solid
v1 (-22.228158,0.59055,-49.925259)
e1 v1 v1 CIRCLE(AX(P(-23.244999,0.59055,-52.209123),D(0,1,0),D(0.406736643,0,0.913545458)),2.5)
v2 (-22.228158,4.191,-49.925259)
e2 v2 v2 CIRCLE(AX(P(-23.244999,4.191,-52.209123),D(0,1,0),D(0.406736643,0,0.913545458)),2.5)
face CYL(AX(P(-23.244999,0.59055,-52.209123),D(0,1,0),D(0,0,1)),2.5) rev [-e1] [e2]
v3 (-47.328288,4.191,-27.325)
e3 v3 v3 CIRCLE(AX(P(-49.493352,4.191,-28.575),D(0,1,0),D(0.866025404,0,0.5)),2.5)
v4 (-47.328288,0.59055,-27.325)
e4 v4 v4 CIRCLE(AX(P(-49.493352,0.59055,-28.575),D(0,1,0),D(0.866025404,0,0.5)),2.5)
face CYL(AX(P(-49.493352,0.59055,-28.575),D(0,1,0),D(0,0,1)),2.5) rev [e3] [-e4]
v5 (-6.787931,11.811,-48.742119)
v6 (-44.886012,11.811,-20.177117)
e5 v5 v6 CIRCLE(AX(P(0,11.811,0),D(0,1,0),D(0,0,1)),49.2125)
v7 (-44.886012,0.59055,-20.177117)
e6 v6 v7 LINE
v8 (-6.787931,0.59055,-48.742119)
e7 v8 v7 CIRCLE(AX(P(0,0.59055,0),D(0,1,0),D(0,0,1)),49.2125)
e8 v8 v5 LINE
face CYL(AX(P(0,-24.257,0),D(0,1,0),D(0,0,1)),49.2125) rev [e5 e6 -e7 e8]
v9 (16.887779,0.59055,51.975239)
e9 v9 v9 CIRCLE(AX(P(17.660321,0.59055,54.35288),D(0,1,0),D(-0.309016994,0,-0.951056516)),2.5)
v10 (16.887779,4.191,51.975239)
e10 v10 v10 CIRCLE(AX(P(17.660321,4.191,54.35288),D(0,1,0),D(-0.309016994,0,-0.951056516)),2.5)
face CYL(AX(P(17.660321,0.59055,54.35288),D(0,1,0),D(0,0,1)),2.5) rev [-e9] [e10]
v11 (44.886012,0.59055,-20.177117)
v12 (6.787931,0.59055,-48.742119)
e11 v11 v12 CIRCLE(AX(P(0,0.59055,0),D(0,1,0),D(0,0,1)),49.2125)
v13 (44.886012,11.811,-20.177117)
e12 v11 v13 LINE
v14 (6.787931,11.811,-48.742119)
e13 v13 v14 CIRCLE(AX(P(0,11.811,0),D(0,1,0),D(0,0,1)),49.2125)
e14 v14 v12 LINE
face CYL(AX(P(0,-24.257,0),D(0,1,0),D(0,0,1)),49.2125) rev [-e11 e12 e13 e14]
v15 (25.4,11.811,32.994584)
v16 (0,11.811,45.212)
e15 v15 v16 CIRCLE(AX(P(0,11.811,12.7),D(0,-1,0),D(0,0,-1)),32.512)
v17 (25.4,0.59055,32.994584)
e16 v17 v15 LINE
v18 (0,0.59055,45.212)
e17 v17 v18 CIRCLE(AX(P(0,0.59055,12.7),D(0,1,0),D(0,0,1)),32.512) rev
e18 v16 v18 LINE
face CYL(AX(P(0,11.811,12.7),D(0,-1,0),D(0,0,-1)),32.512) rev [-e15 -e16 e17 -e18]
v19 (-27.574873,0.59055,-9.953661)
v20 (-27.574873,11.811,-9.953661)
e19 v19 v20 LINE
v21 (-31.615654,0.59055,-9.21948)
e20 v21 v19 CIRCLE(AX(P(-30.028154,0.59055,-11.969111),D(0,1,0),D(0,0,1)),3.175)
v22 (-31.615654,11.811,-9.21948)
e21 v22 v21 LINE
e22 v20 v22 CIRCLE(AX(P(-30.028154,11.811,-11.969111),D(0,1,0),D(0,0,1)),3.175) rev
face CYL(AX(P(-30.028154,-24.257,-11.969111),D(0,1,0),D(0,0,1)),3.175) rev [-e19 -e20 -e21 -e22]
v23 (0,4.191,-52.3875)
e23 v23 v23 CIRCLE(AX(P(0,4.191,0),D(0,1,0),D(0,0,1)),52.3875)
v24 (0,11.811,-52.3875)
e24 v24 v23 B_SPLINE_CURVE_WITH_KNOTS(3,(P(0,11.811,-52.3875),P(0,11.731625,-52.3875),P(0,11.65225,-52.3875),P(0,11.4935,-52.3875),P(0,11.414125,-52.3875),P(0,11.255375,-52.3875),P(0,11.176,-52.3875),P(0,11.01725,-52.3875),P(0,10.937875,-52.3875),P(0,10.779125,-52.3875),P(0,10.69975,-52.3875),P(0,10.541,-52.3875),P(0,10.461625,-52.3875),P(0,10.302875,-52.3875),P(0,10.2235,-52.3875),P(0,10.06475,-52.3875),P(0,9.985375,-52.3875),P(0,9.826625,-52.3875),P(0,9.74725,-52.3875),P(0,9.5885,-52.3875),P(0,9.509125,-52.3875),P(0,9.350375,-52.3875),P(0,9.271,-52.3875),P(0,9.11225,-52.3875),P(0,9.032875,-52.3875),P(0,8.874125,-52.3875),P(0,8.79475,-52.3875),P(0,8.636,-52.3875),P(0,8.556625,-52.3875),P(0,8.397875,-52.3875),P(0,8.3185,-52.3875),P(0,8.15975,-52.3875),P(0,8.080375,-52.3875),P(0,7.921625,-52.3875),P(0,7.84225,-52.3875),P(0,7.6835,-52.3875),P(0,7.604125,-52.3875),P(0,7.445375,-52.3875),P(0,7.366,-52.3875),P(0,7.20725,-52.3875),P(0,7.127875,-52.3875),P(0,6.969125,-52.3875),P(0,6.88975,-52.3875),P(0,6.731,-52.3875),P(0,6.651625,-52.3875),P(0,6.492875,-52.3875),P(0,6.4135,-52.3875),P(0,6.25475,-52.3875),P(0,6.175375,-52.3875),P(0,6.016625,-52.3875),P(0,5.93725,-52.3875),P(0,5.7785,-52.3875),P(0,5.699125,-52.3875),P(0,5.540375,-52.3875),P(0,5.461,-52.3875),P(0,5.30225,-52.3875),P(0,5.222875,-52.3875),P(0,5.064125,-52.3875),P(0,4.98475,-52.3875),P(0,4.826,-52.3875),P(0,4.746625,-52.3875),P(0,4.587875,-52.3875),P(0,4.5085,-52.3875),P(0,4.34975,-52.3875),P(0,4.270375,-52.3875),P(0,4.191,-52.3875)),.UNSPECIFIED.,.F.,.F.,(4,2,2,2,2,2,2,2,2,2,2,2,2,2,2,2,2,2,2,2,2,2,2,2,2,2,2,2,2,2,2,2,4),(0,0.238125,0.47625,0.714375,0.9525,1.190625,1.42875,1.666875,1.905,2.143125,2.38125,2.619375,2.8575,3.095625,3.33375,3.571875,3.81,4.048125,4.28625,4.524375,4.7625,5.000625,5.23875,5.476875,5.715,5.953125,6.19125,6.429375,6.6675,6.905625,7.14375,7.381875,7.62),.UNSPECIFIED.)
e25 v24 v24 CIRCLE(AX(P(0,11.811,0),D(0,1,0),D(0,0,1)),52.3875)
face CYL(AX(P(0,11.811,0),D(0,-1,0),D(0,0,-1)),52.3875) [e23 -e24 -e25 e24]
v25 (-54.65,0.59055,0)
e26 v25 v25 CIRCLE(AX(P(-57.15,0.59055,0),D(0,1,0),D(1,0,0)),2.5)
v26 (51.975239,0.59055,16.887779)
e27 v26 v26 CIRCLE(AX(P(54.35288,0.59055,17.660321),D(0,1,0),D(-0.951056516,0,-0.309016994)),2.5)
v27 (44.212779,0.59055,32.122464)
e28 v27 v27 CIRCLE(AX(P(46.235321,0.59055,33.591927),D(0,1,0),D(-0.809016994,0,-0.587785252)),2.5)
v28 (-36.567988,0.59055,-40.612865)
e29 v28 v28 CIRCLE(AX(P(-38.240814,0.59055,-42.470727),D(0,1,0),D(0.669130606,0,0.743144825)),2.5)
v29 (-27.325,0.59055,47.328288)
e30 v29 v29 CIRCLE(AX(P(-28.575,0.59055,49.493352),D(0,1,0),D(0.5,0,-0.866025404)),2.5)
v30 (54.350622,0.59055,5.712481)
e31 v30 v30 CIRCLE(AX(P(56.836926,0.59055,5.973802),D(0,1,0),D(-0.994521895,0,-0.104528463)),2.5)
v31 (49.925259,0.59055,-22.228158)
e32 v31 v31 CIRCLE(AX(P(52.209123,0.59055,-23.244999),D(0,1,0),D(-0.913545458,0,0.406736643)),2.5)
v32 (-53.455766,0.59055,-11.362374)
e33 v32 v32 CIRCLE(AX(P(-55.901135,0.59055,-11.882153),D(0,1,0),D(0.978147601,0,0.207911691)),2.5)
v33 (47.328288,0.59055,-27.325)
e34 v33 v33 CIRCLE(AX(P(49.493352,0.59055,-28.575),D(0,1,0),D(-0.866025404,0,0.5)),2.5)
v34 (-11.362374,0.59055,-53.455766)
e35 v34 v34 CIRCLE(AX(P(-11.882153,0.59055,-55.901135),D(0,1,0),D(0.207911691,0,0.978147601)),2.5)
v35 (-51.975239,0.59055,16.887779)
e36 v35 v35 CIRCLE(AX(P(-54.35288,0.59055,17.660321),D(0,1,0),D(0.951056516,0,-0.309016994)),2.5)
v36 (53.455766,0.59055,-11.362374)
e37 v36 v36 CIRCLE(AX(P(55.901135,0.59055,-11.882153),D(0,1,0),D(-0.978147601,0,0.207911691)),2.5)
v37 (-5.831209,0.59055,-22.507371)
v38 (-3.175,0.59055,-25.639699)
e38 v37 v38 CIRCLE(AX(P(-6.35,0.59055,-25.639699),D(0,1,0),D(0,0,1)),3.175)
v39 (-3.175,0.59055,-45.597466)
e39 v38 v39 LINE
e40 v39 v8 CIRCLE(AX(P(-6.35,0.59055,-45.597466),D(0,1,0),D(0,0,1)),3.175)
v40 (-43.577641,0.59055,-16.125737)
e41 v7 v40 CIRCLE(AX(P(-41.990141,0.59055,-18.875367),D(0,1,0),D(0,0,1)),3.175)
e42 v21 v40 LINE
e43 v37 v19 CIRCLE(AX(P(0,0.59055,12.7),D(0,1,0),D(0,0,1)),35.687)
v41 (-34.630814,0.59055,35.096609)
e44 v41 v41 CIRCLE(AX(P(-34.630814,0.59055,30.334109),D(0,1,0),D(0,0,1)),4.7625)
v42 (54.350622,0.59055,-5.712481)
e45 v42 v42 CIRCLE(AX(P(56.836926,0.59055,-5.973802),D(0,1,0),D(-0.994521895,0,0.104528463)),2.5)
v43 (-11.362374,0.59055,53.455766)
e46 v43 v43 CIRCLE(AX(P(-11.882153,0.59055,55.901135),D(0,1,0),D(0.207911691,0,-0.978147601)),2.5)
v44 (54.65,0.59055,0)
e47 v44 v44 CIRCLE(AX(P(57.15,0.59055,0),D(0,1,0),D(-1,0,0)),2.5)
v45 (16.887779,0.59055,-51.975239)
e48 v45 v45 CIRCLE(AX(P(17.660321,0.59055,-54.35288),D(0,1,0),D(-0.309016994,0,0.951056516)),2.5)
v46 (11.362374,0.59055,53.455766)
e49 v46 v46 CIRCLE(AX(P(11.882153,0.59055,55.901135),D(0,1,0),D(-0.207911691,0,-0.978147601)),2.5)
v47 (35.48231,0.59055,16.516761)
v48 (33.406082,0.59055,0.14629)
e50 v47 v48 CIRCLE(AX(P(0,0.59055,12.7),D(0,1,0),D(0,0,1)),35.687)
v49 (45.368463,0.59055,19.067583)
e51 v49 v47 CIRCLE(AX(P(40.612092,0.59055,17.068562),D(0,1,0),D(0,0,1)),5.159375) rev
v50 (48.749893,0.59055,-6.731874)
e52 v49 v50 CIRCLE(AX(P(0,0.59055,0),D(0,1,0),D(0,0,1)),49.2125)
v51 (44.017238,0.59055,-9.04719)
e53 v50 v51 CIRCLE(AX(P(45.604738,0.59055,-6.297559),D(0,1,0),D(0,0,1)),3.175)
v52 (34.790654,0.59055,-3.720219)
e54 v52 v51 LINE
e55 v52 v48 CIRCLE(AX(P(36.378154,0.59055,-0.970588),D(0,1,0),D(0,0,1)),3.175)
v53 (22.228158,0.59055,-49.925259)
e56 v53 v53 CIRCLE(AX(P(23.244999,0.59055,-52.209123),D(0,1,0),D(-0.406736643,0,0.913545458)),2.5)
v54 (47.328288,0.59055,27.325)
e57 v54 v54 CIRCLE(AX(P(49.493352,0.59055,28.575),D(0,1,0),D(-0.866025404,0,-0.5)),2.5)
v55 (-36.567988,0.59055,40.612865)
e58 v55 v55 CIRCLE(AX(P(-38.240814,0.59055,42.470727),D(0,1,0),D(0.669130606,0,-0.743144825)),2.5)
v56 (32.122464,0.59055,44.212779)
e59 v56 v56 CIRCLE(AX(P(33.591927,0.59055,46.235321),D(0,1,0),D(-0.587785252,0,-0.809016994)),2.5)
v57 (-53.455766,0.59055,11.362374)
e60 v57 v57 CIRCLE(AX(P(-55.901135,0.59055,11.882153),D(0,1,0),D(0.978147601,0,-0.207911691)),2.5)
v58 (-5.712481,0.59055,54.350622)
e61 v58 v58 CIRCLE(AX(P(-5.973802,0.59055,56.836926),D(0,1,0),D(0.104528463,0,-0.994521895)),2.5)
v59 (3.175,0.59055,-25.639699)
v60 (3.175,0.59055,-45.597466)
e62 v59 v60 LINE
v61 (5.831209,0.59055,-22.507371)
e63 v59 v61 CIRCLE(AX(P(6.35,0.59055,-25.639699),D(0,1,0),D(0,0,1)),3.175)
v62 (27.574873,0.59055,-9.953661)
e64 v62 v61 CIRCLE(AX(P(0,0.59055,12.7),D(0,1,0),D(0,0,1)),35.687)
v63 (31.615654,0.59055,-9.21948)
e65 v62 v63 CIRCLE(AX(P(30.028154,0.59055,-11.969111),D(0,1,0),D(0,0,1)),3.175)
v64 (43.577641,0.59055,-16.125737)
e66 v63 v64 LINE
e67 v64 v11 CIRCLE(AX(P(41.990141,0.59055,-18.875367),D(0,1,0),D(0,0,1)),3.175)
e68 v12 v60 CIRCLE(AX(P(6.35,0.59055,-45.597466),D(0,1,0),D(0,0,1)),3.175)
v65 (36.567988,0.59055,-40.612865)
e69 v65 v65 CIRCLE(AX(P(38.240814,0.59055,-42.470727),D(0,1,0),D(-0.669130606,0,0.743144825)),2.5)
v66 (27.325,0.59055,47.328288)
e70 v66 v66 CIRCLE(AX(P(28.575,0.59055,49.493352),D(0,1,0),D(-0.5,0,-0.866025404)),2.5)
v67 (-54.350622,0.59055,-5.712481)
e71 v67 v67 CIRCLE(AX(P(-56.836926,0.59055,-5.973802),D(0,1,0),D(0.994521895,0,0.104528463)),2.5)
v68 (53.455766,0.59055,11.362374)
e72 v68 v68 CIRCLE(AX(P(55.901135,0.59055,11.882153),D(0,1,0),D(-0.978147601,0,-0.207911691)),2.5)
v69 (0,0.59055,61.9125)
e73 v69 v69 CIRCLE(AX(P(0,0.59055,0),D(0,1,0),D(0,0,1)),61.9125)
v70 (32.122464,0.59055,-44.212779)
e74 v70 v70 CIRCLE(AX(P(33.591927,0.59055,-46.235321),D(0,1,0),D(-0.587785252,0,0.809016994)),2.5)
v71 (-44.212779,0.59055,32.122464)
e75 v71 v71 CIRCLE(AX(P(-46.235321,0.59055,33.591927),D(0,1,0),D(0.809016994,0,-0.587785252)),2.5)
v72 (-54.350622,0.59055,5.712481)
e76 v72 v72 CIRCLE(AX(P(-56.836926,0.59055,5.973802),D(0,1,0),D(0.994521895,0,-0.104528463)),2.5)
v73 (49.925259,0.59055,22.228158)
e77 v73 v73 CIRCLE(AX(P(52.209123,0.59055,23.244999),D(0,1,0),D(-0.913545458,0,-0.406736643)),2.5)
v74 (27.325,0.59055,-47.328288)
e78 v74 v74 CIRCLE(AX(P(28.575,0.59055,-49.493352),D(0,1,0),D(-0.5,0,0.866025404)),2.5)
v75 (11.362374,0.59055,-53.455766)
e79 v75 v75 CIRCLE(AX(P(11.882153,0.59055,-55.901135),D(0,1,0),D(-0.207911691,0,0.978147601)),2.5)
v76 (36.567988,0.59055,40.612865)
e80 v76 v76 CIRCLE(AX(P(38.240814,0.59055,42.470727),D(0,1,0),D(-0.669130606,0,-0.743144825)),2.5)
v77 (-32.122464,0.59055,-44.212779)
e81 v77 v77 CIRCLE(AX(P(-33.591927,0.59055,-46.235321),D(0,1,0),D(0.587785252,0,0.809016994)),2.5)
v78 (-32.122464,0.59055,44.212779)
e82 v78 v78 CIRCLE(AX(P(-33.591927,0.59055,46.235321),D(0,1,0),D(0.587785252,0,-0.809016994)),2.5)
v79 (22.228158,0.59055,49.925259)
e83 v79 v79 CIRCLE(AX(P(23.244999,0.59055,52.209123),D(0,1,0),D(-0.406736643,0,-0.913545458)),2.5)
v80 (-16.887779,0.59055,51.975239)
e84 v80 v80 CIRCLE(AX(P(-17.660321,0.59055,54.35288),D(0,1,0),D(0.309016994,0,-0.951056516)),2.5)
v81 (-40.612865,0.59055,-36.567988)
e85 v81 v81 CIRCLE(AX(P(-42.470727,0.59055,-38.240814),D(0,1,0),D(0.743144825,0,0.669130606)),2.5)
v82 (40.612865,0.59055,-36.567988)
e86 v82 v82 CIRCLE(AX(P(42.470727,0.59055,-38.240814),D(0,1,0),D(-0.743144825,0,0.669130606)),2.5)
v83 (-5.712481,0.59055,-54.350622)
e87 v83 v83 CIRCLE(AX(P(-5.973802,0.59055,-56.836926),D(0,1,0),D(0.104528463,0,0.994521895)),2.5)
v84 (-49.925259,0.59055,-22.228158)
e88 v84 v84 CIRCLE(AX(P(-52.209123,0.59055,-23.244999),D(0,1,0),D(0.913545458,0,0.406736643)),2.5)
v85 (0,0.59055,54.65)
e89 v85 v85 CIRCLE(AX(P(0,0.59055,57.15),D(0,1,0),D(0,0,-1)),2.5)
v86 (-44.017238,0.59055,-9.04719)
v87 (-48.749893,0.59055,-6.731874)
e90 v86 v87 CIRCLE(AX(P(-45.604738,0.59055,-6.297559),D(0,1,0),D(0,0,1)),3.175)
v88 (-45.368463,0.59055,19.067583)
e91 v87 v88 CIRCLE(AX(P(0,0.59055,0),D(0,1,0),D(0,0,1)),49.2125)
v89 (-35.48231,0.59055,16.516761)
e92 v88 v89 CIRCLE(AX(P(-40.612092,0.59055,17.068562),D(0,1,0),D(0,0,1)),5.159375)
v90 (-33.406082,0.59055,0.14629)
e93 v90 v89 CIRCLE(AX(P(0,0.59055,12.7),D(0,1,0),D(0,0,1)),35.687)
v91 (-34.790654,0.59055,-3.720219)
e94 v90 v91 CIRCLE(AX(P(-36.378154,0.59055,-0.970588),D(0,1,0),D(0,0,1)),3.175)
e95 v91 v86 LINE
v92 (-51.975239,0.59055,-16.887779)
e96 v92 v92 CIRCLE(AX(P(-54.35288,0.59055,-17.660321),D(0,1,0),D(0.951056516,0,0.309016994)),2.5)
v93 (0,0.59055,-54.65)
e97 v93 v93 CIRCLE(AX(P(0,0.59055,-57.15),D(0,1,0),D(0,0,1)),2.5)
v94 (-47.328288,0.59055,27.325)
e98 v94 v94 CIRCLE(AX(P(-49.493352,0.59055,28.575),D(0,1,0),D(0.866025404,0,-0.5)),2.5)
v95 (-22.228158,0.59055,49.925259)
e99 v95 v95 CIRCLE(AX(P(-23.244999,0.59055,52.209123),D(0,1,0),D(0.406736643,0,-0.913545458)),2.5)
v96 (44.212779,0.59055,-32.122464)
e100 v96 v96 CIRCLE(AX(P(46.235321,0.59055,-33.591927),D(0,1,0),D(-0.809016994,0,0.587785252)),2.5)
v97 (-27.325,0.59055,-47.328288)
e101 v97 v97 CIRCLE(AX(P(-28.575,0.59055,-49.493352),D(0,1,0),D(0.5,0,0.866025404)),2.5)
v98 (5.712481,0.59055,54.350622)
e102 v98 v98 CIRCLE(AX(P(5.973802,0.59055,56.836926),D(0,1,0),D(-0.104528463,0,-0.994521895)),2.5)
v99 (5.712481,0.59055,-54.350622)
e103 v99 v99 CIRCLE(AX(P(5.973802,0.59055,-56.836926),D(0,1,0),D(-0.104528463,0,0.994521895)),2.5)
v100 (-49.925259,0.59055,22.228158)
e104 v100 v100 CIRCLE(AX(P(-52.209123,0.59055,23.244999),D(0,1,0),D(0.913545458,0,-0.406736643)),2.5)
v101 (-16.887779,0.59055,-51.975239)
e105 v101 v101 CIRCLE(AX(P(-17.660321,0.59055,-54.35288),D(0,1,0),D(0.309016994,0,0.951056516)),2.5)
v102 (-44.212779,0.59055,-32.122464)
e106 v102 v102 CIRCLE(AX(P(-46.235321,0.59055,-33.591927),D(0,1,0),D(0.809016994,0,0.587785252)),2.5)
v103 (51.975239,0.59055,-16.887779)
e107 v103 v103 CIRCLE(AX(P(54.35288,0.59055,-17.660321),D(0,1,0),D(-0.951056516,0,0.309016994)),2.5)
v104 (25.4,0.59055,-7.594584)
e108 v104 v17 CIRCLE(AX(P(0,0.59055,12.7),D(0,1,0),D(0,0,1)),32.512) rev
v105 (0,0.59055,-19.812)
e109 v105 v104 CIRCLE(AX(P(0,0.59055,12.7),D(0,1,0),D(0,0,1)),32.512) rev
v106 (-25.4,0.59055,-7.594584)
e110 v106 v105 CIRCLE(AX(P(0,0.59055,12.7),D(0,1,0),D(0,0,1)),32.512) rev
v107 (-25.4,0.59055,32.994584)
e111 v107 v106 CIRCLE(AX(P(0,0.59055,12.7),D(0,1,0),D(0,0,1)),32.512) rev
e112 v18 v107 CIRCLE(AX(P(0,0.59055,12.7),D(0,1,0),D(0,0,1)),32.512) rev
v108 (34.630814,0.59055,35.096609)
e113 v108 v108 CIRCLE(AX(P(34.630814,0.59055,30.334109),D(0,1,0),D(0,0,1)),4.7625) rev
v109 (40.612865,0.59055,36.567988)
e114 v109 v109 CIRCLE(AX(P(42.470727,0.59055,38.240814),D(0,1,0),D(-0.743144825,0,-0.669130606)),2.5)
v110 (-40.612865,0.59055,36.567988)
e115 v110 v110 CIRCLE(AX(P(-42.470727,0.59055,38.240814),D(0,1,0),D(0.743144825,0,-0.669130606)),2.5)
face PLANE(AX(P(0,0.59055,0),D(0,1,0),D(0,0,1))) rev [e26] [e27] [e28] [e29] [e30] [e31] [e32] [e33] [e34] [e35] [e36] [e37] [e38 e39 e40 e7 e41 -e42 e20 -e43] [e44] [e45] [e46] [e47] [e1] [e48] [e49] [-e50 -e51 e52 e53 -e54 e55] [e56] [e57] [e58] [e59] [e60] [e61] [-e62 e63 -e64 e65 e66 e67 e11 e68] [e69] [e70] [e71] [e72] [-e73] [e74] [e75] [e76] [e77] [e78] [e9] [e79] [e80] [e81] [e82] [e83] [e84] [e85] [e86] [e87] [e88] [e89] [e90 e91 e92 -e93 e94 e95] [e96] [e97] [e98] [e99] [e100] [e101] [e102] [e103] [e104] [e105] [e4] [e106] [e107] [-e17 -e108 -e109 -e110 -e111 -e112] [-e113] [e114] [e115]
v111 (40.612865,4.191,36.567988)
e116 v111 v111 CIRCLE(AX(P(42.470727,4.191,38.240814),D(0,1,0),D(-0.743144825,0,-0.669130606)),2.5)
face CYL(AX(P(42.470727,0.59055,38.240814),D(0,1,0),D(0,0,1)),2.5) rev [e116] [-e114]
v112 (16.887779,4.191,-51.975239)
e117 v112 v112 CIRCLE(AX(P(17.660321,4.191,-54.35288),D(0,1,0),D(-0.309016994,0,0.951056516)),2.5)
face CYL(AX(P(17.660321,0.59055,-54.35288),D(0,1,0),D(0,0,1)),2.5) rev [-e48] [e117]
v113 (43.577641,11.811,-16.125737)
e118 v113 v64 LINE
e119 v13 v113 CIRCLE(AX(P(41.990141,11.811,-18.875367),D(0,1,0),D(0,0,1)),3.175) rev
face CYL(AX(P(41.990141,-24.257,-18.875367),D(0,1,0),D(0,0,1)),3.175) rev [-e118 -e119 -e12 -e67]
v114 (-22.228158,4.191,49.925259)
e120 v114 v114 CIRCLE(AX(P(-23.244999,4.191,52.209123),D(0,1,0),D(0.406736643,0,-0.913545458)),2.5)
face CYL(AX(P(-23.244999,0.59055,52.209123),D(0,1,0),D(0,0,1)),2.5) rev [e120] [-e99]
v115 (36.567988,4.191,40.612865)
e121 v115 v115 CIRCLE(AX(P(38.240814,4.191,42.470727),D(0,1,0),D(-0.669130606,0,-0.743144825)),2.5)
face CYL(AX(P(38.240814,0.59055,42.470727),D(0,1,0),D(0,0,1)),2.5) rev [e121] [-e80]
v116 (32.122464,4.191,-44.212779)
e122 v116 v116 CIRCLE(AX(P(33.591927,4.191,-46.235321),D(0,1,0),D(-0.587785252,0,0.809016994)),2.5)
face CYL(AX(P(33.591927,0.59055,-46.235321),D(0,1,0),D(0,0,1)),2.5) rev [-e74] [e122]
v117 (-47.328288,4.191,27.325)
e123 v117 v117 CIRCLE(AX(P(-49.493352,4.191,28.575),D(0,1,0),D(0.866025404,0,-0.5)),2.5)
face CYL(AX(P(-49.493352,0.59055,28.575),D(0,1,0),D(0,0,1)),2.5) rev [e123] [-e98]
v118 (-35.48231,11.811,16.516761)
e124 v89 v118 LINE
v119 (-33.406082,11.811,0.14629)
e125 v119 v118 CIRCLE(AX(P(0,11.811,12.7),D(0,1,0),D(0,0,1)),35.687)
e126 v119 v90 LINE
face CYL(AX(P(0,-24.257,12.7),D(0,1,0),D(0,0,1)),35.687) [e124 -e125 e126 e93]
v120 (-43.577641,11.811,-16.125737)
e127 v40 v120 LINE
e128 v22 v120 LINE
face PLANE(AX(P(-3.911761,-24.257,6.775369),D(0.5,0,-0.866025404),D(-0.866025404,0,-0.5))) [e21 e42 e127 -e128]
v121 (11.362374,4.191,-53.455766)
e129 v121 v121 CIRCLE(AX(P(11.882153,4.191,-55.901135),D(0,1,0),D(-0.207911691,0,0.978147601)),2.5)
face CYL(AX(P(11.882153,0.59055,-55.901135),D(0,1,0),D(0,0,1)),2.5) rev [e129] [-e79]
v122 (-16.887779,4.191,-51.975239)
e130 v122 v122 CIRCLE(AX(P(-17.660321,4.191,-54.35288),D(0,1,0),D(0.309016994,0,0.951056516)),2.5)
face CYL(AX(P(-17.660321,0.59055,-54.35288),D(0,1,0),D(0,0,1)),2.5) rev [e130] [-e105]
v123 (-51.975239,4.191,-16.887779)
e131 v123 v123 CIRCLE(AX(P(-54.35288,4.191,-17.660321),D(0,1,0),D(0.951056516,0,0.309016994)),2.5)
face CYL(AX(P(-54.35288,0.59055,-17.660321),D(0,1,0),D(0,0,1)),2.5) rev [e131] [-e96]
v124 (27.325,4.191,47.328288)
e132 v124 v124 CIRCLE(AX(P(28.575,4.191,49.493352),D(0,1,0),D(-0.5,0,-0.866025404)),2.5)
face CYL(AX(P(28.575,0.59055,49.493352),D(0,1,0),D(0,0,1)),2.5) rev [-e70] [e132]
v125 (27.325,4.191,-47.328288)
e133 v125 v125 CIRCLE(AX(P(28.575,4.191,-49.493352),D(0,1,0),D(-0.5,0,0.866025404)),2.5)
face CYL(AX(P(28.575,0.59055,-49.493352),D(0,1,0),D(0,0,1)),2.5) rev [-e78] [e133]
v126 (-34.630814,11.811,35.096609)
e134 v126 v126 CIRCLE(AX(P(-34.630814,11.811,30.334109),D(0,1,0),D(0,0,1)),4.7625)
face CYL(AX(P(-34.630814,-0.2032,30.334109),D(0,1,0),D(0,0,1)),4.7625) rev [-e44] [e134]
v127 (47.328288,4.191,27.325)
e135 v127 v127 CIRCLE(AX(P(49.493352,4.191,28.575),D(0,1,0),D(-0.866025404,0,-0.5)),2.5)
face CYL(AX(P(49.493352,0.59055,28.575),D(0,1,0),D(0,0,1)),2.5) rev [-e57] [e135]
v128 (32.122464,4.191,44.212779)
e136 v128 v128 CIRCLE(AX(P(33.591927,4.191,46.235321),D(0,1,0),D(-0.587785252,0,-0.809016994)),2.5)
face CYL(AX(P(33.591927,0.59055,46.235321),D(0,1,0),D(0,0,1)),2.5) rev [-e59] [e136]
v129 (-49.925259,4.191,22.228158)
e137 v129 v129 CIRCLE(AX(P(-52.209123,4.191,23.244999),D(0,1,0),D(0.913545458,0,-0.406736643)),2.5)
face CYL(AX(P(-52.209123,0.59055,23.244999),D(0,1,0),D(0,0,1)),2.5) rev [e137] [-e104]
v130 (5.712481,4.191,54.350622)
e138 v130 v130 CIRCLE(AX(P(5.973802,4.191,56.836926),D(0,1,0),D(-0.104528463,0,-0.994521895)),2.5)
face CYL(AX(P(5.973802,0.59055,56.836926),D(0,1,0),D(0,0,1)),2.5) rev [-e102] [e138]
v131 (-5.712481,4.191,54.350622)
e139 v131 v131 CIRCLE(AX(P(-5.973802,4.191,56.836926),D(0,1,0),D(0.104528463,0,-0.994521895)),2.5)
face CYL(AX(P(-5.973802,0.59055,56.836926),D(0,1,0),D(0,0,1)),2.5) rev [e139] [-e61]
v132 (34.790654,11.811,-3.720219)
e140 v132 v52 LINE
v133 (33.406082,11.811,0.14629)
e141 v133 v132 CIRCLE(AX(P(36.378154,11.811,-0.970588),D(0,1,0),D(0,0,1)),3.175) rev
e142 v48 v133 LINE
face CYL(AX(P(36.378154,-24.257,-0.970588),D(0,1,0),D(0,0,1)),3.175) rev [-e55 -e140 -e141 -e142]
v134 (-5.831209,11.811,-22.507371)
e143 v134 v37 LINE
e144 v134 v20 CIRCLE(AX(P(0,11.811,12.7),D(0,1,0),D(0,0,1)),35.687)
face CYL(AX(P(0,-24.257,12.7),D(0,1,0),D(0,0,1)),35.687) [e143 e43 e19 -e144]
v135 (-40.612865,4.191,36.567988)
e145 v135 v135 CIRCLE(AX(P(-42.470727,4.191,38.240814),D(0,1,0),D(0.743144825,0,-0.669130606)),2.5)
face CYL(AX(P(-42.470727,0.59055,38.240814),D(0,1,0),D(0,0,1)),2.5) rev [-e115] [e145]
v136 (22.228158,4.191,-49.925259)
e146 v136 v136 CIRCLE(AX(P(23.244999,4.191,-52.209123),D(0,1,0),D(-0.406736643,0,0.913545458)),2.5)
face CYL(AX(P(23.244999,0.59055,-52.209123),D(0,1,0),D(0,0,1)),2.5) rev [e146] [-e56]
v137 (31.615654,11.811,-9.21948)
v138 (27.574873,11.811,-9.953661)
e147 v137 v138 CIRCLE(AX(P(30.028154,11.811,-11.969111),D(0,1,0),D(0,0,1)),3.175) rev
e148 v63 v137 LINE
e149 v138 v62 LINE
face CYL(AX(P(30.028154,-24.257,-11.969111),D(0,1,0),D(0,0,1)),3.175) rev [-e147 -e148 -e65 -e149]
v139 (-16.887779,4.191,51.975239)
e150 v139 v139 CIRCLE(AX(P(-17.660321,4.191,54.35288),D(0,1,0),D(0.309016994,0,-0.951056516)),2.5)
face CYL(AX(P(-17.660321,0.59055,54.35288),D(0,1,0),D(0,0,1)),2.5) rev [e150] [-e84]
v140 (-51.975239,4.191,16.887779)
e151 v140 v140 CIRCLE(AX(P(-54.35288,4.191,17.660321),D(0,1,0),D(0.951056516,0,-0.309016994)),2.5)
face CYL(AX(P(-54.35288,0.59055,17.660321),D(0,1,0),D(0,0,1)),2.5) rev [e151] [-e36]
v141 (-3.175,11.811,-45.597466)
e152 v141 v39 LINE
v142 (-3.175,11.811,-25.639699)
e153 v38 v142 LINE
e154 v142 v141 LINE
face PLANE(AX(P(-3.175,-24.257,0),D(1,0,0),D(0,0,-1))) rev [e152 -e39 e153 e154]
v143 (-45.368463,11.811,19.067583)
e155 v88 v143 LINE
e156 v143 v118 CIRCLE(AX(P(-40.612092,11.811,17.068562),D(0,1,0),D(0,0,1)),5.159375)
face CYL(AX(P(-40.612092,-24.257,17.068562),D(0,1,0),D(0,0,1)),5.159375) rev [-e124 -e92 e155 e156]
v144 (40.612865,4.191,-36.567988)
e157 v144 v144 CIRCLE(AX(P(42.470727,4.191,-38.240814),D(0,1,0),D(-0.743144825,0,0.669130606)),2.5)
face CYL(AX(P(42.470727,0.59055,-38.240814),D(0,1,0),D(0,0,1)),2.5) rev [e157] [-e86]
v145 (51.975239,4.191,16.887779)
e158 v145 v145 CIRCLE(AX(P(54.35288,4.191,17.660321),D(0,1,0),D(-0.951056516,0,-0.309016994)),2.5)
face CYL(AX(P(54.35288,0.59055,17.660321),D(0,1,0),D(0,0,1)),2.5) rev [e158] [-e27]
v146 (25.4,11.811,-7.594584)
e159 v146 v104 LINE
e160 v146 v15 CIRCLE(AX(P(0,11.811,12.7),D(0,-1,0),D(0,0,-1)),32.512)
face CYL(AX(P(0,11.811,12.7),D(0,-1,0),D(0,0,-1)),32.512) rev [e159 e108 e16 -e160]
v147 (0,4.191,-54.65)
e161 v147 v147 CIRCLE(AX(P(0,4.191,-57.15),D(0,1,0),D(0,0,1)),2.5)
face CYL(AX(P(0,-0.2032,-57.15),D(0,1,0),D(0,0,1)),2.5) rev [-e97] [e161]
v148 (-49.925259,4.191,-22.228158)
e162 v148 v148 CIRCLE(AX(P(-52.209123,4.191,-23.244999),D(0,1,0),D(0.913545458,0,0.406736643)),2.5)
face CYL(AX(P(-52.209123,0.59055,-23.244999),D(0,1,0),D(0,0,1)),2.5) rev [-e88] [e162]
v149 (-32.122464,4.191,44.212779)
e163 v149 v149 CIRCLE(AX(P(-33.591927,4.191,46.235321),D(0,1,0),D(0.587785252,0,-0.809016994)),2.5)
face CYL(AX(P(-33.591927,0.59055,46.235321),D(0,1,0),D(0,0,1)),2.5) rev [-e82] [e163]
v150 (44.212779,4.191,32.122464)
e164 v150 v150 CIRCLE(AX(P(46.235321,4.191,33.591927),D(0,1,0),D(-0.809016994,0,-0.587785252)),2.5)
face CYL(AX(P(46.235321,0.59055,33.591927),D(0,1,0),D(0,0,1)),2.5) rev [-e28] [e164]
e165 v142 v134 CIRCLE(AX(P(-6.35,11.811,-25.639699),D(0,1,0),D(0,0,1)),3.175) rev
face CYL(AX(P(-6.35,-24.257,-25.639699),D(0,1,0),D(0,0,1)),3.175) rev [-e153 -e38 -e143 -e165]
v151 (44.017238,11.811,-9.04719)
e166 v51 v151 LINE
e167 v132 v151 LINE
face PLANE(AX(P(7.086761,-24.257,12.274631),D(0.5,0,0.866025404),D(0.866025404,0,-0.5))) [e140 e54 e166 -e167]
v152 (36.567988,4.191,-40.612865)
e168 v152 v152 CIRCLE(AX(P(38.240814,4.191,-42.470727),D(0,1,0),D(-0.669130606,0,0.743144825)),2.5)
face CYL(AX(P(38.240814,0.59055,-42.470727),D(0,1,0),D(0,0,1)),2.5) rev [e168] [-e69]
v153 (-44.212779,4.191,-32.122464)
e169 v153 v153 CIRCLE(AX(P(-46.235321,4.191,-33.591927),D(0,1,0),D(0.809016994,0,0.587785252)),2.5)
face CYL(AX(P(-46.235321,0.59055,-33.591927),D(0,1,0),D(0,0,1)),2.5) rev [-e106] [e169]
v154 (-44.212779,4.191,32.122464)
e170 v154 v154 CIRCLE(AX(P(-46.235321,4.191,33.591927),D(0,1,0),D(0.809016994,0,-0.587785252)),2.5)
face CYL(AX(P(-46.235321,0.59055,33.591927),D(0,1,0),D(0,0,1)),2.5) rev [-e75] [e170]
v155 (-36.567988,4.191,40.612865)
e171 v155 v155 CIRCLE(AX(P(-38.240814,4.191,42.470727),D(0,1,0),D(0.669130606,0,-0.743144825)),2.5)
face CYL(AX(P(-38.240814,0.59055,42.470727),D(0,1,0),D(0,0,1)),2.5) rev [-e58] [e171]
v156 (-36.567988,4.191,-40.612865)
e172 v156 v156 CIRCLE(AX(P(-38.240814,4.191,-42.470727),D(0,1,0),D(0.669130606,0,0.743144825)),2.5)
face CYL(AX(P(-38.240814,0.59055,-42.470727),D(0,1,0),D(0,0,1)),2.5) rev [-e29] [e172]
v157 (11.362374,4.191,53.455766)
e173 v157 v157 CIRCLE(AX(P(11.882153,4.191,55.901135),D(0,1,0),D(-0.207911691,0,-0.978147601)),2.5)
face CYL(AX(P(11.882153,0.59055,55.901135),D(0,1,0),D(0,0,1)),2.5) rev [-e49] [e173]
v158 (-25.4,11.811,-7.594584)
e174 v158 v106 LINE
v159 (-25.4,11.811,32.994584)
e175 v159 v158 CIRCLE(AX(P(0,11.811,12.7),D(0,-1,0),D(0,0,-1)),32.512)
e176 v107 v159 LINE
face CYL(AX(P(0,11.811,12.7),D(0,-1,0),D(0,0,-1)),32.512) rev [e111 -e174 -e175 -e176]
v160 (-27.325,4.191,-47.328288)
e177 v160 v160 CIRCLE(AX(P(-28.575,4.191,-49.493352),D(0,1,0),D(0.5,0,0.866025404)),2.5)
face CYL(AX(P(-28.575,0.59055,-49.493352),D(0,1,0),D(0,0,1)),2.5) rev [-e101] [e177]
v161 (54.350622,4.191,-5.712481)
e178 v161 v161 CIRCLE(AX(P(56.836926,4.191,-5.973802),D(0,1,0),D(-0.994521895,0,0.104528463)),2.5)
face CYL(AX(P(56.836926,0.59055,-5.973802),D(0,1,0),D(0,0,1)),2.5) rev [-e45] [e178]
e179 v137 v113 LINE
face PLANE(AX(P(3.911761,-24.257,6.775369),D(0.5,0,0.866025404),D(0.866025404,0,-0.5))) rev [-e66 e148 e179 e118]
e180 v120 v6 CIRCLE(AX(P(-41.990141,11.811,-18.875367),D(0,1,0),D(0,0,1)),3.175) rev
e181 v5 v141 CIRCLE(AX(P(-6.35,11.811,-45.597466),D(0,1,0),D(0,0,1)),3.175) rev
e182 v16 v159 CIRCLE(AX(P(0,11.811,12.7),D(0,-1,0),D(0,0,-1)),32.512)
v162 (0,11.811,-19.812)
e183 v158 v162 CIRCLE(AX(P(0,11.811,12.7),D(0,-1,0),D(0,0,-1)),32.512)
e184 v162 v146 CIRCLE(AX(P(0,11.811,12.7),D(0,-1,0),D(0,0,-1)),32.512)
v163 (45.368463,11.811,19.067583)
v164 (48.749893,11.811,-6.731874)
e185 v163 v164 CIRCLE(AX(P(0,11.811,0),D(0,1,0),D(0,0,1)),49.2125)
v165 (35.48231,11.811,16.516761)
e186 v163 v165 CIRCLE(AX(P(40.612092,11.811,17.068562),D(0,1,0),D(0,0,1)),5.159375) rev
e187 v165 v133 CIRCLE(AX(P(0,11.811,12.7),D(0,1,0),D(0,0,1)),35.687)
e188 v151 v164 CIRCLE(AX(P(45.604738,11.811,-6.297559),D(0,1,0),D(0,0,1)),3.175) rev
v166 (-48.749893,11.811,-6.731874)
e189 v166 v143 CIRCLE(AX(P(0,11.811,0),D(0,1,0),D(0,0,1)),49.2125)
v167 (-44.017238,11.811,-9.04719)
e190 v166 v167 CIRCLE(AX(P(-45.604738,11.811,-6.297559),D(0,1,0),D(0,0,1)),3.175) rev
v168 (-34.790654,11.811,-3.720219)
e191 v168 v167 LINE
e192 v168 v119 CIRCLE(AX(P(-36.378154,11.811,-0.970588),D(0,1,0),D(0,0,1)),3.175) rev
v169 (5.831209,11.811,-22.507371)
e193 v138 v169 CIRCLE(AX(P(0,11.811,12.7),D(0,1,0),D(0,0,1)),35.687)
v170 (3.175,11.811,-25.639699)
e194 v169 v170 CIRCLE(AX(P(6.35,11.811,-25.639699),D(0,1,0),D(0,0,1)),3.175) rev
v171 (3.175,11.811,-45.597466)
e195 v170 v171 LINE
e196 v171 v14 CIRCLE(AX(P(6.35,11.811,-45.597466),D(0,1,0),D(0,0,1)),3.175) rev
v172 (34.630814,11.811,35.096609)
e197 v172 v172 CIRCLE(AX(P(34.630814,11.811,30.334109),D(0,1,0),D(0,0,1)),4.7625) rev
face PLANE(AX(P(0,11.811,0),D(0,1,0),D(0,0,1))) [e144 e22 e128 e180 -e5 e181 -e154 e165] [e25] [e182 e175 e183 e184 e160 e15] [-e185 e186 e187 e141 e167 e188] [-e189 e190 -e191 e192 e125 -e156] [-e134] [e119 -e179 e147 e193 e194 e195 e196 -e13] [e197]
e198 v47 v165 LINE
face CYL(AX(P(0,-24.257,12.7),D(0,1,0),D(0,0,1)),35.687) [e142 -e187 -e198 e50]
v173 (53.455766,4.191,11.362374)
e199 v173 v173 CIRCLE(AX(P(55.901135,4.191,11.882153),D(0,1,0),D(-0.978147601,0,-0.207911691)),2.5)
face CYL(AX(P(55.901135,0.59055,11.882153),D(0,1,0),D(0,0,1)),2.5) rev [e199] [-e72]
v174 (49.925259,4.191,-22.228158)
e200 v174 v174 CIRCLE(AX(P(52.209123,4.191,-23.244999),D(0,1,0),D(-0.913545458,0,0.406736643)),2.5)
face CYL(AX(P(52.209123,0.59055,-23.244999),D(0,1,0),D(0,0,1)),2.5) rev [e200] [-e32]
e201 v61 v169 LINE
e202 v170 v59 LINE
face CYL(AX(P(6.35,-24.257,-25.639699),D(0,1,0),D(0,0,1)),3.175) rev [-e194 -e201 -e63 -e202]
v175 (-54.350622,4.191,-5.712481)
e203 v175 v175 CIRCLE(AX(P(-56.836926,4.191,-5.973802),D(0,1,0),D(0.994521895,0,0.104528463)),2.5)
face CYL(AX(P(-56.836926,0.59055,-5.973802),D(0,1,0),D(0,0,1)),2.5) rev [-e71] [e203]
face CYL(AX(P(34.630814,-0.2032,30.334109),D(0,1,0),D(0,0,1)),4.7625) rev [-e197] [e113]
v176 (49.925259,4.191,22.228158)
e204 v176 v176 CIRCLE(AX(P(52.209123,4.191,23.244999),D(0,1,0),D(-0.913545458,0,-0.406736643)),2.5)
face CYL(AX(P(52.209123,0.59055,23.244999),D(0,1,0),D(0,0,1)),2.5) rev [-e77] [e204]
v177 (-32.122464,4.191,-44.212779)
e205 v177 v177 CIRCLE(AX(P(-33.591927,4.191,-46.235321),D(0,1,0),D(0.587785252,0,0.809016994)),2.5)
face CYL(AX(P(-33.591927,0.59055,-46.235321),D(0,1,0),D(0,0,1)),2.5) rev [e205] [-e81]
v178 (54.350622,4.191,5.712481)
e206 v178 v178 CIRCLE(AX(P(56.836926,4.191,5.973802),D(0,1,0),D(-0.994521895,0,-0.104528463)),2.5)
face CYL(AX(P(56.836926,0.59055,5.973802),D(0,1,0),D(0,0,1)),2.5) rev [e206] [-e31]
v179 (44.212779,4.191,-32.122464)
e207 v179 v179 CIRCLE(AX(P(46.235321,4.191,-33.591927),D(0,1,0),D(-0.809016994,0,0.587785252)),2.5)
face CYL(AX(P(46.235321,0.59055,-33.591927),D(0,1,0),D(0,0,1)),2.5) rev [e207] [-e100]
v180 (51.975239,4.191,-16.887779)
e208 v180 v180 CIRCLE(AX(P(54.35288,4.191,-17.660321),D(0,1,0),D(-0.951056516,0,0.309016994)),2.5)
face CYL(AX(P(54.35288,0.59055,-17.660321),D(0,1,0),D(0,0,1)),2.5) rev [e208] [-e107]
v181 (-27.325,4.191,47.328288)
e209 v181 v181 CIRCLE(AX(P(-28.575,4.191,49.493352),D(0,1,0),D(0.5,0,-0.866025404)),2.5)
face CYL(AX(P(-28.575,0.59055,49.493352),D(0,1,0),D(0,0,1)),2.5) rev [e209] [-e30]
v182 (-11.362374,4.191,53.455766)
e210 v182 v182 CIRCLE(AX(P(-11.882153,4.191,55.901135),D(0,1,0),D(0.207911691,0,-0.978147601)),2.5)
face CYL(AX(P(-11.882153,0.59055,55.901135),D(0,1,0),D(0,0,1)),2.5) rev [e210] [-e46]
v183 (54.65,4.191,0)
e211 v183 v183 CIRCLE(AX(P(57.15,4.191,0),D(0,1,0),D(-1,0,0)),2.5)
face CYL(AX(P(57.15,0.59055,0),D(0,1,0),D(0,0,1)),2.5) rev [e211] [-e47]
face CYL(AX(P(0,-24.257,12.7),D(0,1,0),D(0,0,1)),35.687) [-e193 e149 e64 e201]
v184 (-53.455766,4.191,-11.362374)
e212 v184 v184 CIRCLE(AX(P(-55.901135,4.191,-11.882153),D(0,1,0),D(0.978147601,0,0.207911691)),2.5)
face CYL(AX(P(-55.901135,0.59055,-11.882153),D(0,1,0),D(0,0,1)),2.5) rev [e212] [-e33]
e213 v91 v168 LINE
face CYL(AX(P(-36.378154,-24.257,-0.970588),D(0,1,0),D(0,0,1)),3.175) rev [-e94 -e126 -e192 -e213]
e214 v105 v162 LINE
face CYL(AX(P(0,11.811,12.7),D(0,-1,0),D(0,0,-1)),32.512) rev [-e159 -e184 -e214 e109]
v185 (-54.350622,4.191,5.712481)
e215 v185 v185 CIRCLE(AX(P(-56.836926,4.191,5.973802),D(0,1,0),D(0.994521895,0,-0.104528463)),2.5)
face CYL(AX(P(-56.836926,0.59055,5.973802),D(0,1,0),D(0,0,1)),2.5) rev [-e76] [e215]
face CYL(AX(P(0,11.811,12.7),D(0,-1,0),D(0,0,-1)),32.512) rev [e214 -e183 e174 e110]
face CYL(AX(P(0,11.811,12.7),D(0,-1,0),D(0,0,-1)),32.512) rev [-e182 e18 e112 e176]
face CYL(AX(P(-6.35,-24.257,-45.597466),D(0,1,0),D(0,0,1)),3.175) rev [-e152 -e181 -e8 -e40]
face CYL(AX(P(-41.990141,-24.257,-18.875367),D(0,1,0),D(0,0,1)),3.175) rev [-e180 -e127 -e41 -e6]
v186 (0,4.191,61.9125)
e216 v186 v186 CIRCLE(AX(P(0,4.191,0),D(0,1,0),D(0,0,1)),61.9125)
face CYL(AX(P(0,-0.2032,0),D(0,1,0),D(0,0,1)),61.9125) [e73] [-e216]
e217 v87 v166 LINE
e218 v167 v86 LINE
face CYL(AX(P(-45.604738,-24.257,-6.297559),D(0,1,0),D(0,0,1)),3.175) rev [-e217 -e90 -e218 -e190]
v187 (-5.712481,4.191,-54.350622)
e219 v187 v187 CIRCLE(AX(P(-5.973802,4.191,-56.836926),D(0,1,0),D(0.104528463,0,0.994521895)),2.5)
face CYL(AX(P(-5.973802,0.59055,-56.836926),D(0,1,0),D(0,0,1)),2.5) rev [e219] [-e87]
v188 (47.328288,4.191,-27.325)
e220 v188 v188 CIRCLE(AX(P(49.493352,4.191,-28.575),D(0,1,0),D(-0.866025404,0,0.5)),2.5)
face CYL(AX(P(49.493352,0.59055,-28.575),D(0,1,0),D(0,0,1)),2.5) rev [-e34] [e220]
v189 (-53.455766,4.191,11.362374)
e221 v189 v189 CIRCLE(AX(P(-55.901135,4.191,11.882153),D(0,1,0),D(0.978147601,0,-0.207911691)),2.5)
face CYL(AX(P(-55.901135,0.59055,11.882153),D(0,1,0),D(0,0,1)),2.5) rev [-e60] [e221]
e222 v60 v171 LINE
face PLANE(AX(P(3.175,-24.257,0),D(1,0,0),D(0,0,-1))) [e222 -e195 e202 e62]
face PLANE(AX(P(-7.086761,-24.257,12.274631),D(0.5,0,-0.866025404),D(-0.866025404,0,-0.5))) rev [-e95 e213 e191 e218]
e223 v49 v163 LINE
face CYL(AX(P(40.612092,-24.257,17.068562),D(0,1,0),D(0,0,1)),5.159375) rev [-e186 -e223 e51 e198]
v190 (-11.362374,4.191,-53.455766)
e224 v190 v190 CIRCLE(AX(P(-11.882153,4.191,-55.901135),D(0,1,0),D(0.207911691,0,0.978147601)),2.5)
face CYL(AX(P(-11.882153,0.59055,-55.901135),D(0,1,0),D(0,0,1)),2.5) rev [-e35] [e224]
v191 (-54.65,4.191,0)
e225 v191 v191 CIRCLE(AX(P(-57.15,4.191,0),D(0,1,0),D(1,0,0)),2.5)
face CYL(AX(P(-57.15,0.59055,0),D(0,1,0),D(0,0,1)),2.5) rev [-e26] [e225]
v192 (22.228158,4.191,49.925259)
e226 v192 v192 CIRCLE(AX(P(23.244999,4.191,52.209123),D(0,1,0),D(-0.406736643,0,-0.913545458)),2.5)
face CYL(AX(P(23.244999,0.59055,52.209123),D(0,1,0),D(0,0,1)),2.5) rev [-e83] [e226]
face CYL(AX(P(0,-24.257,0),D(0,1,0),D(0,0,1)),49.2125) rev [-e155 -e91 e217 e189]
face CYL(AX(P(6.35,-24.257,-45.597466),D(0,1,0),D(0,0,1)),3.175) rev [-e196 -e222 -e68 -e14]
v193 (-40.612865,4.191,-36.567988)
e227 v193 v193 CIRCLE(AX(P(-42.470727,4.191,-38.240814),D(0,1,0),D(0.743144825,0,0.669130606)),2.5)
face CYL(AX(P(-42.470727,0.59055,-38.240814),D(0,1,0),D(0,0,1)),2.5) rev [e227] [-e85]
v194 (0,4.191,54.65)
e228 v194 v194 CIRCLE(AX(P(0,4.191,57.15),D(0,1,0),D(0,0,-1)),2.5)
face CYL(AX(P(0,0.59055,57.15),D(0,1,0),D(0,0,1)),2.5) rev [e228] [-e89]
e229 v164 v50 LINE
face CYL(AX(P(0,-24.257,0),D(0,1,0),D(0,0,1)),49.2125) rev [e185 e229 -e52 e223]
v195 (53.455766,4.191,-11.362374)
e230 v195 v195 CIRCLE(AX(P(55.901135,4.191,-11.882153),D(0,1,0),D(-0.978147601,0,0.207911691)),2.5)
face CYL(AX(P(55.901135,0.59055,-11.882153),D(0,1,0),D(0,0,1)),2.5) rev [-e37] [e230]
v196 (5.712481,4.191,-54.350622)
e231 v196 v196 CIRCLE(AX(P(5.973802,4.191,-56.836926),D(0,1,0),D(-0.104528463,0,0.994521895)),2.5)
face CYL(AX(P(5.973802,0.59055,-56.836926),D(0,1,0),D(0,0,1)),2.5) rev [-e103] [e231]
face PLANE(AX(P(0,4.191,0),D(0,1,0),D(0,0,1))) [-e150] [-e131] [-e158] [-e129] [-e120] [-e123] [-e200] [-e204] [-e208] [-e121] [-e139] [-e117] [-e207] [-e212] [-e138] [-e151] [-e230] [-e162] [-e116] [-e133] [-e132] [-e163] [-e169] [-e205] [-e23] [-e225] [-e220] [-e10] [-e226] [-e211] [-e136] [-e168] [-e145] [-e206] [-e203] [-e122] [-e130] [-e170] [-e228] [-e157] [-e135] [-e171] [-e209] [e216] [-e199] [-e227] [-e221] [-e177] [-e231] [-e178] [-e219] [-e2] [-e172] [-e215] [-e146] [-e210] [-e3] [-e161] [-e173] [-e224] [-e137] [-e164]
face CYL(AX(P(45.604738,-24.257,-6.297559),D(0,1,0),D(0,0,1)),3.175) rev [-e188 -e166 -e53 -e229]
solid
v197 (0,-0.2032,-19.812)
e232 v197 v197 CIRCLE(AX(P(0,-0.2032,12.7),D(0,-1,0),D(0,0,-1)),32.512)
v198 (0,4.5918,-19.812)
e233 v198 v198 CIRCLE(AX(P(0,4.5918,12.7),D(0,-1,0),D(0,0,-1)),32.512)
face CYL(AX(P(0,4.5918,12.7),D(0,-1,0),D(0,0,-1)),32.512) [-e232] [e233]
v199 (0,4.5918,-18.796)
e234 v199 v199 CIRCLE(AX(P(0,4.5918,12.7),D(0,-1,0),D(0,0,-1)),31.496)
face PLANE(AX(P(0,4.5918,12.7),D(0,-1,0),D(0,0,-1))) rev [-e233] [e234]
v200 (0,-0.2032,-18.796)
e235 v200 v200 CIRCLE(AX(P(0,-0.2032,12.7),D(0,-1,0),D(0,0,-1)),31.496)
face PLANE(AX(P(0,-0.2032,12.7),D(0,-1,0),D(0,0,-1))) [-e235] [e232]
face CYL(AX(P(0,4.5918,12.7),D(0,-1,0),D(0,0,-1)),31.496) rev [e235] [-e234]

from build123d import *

# Parameters (mm, degrees)
SLOTTED_BODY_EXTRUDE_DEPTH      = 4.191
SLOTTED_BODY_EXTRUDE_DEPTH_BACK = 0.2032
SKETCH1_R                       = 61.9125
SKETCH1_R_2                     = 30.988
SKETCH5_R                       = 52.3875
BOSS_EXTRUDE3_DEPTH             = 7.62
SKETCH6_R                       = 32.512
CUT_EXTRUDE5_DEPTH              = 89.377917571
SKETCH8_R                       = 32.512
SKETCH8_R_2                     = 31.496
BOSS_EXTRUDE4_DEPTH             = 4.795000062
SKETCH13_R                      = 5.159375
CUT_EXTRUDE7_DEPTH              = 36.068
FILLET1_R                       = 3.175
MOVE_START                      = -0.2032
MOVE_FACE2_OUTLINE_R            = 61.9125
MOVE_FACE2_DEPTH                = 0.79375
SKETCH13_5_R                    = 3.175
CUT_EXTRUDE9_DEPTH              = 89.377917571
MOVE_FACE3_BY                   = 1.5875
MOVE_FACE3_2_BY                 = 1.5875
SKETCH14_R                      = 2.5
CUT_EXTRUDE10_DEPTH             = 88.888450393
CIRPATTERN1_COUNT               = 60


# Read off the part's stored shape, not the designer's step: Move Face2
with BuildPart() as part:
    # Sketch1 → Slotted-Body Extrude (new, two sides: drawn at the far end of the back side and taken through both)
    with BuildSketch(Plane(origin=(0, 0, 0), x_dir=(1, 0, 0), z_dir=(0, 1, 0)).offset(-SLOTTED_BODY_EXTRUDE_DEPTH_BACK)):
        with Locations(Location((0, 0, 0), (0, 0, 270))):
            Circle(SKETCH1_R)
        with Locations(Location((0, -12.7, 0), (0, 0, 270))):
            Circle(SKETCH1_R_2, mode=Mode.SUBTRACT)
    extrude(amount=SLOTTED_BODY_EXTRUDE_DEPTH + SLOTTED_BODY_EXTRUDE_DEPTH_BACK)

    # Sketch5 → Boss-Extrude3 (add)
    with BuildSketch(Plane(origin=(0, 4.191, 0), x_dir=(1, 0, 0), z_dir=(0, 1, 0))):
        with Locations(Location((0, 0, 0), (0, 0, 90))):
            Circle(SKETCH5_R)
    extrude(amount=BOSS_EXTRUDE3_DEPTH)

    # Sketch6 → Cut-Extrude5 (cut, through all)
    with BuildSketch(Plane.XZ.offset(0.2032)):
        with Locations(Location((0, 12.7, 0), (0, 0, 270))):
            Circle(SKETCH6_R)
    extrude(amount=-CUT_EXTRUDE5_DEPTH, mode=Mode.SUBTRACT)

    # Sketch13 → Cut-Extrude7 (cut)
    with BuildSketch(Plane(origin=(0, 11.811, 0), x_dir=(1, 0, 0), z_dir=(0, 1, 0))):
        with Locations((-40.612092014, -17.068561875)):
            Circle(SKETCH13_R)
        with BuildLine():
            ThreePointArc((-35.482309697, -16.516761399), (-35.210027203, -6.884851392), (-32.370791052, 2.323110718))
            Line((-32.370791052, 2.323110718), (-47.900191204, 11.289014077))
            ThreePointArc((-47.900191204, 11.289014077), (-49.04223906, -4.09010321), (-45.36846312, -19.06758271))
            ThreePointArc((-45.36846312, -19.06758271), (-41.901096019, -12.072801766), (-35.482309697, -16.516761399))
        make_face()
        with BuildLine():
            Line((-45.989035316, 17.517956129), (-29.195791052, 7.822372033))
            ThreePointArc((-29.195791052, 7.822372033), (-17.8435, 18.205848585), (-3.175, 22.845482751))
            Line((-3.175, 22.845482751), (-3.175, 49.109973847))
            ThreePointArc((-3.175, 49.109973847), (-29.219676385, 39.598998324), (-45.989035316, 17.517956129))
        make_face()
        with BuildLine():
            Line((3.175, 49.109973847), (3.175, 22.845482751))
            ThreePointArc((3.175, 22.845482751), (17.8435, 18.205848585), (29.195791052, 7.822372033))
            Line((29.195791052, 7.822372033), (45.989035316, 17.517956129))
            ThreePointArc((45.989035316, 17.517956129), (29.219676385, 39.598998324), (3.175, 49.109973847))
        make_face()
        with BuildLine():
            Line((47.900191204, 11.289014077), (32.370791052, 2.323110718))
            ThreePointArc((32.370791052, 2.323110718), (34.848087389, -5.007615821), (35.687, -12.7))
            ThreePointArc((35.687, -12.7), (35.635790683, -14.611123079), (35.482309697, -16.516761399))
            ThreePointArc((35.482309697, -16.516761399), (40.888388726, -11.916590357), (45.771467014, -17.068561875))
            ThreePointArc((45.771467014, -17.068561875), (45.669712629, -18.088181465), (45.36846312, -19.06758271))
            ThreePointArc((45.36846312, -19.06758271), (48.241919777, -9.725601908), (49.2125, 0))
            ThreePointArc((49.2125, 0), (48.883321879, 5.682516898), (47.900191204, 11.289014077))
        make_face()
        with Locations((40.612092014, -17.068561875)):
            Circle(SKETCH13_R)
    extrude(amount=-CUT_EXTRUDE7_DEPTH, mode=Mode.SUBTRACT)

    # Fillet1
    fillet1_edges = [part.edges().sort_by_distance(p)[0] for p in [
        (-3.175, 5.8039, -22.845482751),
        (-29.195791052, 5.8039, -7.822372033),
        (-45.989035316, 5.8039, -17.517956129),
        (-3.175, 5.8039, -49.109973847),
        (29.195791052, 5.8039, -7.822372033),
        (3.175, 5.8039, -22.845482751),
        (3.175, 5.8039, -49.109973847),
        (45.989035316, 5.8039, -17.517956129),
        (32.370791052, 5.8039, -2.323110718),
        (47.900191204, 5.8039, -11.289014077),
        (-47.900191204, 5.8039, -11.289014077),
        (-32.370791052, 5.8039, -2.323110718),
    ]]
    fillet(fillet1_edges, radius=FILLET1_R)

    # Move Face2 outline → Move Face2 (cut)
    with BuildSketch(Plane(origin=(0, 0, 0), x_dir=(1, 0, 0), z_dir=(0, 1, 0)).offset(MOVE_START)):
        Circle(MOVE_FACE2_OUTLINE_R)
    extrude(amount=MOVE_FACE2_DEPTH, mode=Mode.SUBTRACT)

    # Sketch13<5> → Cut-Extrude9 (cut, through all)
    with BuildSketch(Plane(origin=(0, 11.811, 0), x_dir=(1, 0, 0), z_dir=(0, 1, 0))):
        with Locations(Location((-34.630813629, -30.33410875, 0), (0, 0, 270))):
            Circle(SKETCH13_5_R)
        with Locations(Location((34.630813629, -30.33410875, 0), (0, 0, 270))):
            Circle(SKETCH13_5_R)
    extrude(amount=-CUT_EXTRUDE9_DEPTH, mode=Mode.SUBTRACT)

    # Move Face3: a curved face moved inward by 1.5875
    add(Solid.thicken(part.faces().sort_by_distance((34.630813629, 6.200775, 27.15910875))[0], -MOVE_FACE3_BY), mode=Mode.SUBTRACT)

    # Move Face3 2: a curved face moved inward by 1.5875
    add(Solid.thicken(part.faces().sort_by_distance((-34.630813629, 6.200775, 27.15910875))[0], -MOVE_FACE3_2_BY), mode=Mode.SUBTRACT)

    # Sketch14 → Cut-Extrude10 (cut, through all)
    with BuildSketch(Plane(origin=(0, 4.191, 0), x_dir=(1, 0, 0), z_dir=(0, 1, 0))):
        with Locations(Location((0, 57.15, 0), (0, 0, 270))):
            Circle(SKETCH14_R)
    cut_extrude10 = extrude(amount=-CUT_EXTRUDE10_DEPTH, mode=Mode.SUBTRACT)

    # CirPattern1: Cut-Extrude10 ×60 about axis
    cirpattern1_axis = Axis((0, 0, 0), (0, 1, 0))
    for i in range(1, CIRPATTERN1_COUNT):
        add(cut_extrude10.rotate(cirpattern1_axis, i * 360 / CIRPATTERN1_COUNT), mode=Mode.SUBTRACT)


with BuildPart() as body_2:
    # Sketch8 → Boss-Extrude4 (new body)
    with BuildSketch(Plane.XZ.offset(0.2032)):
        with Locations(Location((0, 12.7, 0), (0, 0, 270))):
            Circle(SKETCH8_R)
        with Locations(Location((0, 12.7, 0), (0, 0, 270))):
            Circle(SKETCH8_R_2, mode=Mode.SUBTRACT)
    extrude(amount=-BOSS_EXTRUDE4_DEPTH)


solid = Compound([part.part, body_2.part])
